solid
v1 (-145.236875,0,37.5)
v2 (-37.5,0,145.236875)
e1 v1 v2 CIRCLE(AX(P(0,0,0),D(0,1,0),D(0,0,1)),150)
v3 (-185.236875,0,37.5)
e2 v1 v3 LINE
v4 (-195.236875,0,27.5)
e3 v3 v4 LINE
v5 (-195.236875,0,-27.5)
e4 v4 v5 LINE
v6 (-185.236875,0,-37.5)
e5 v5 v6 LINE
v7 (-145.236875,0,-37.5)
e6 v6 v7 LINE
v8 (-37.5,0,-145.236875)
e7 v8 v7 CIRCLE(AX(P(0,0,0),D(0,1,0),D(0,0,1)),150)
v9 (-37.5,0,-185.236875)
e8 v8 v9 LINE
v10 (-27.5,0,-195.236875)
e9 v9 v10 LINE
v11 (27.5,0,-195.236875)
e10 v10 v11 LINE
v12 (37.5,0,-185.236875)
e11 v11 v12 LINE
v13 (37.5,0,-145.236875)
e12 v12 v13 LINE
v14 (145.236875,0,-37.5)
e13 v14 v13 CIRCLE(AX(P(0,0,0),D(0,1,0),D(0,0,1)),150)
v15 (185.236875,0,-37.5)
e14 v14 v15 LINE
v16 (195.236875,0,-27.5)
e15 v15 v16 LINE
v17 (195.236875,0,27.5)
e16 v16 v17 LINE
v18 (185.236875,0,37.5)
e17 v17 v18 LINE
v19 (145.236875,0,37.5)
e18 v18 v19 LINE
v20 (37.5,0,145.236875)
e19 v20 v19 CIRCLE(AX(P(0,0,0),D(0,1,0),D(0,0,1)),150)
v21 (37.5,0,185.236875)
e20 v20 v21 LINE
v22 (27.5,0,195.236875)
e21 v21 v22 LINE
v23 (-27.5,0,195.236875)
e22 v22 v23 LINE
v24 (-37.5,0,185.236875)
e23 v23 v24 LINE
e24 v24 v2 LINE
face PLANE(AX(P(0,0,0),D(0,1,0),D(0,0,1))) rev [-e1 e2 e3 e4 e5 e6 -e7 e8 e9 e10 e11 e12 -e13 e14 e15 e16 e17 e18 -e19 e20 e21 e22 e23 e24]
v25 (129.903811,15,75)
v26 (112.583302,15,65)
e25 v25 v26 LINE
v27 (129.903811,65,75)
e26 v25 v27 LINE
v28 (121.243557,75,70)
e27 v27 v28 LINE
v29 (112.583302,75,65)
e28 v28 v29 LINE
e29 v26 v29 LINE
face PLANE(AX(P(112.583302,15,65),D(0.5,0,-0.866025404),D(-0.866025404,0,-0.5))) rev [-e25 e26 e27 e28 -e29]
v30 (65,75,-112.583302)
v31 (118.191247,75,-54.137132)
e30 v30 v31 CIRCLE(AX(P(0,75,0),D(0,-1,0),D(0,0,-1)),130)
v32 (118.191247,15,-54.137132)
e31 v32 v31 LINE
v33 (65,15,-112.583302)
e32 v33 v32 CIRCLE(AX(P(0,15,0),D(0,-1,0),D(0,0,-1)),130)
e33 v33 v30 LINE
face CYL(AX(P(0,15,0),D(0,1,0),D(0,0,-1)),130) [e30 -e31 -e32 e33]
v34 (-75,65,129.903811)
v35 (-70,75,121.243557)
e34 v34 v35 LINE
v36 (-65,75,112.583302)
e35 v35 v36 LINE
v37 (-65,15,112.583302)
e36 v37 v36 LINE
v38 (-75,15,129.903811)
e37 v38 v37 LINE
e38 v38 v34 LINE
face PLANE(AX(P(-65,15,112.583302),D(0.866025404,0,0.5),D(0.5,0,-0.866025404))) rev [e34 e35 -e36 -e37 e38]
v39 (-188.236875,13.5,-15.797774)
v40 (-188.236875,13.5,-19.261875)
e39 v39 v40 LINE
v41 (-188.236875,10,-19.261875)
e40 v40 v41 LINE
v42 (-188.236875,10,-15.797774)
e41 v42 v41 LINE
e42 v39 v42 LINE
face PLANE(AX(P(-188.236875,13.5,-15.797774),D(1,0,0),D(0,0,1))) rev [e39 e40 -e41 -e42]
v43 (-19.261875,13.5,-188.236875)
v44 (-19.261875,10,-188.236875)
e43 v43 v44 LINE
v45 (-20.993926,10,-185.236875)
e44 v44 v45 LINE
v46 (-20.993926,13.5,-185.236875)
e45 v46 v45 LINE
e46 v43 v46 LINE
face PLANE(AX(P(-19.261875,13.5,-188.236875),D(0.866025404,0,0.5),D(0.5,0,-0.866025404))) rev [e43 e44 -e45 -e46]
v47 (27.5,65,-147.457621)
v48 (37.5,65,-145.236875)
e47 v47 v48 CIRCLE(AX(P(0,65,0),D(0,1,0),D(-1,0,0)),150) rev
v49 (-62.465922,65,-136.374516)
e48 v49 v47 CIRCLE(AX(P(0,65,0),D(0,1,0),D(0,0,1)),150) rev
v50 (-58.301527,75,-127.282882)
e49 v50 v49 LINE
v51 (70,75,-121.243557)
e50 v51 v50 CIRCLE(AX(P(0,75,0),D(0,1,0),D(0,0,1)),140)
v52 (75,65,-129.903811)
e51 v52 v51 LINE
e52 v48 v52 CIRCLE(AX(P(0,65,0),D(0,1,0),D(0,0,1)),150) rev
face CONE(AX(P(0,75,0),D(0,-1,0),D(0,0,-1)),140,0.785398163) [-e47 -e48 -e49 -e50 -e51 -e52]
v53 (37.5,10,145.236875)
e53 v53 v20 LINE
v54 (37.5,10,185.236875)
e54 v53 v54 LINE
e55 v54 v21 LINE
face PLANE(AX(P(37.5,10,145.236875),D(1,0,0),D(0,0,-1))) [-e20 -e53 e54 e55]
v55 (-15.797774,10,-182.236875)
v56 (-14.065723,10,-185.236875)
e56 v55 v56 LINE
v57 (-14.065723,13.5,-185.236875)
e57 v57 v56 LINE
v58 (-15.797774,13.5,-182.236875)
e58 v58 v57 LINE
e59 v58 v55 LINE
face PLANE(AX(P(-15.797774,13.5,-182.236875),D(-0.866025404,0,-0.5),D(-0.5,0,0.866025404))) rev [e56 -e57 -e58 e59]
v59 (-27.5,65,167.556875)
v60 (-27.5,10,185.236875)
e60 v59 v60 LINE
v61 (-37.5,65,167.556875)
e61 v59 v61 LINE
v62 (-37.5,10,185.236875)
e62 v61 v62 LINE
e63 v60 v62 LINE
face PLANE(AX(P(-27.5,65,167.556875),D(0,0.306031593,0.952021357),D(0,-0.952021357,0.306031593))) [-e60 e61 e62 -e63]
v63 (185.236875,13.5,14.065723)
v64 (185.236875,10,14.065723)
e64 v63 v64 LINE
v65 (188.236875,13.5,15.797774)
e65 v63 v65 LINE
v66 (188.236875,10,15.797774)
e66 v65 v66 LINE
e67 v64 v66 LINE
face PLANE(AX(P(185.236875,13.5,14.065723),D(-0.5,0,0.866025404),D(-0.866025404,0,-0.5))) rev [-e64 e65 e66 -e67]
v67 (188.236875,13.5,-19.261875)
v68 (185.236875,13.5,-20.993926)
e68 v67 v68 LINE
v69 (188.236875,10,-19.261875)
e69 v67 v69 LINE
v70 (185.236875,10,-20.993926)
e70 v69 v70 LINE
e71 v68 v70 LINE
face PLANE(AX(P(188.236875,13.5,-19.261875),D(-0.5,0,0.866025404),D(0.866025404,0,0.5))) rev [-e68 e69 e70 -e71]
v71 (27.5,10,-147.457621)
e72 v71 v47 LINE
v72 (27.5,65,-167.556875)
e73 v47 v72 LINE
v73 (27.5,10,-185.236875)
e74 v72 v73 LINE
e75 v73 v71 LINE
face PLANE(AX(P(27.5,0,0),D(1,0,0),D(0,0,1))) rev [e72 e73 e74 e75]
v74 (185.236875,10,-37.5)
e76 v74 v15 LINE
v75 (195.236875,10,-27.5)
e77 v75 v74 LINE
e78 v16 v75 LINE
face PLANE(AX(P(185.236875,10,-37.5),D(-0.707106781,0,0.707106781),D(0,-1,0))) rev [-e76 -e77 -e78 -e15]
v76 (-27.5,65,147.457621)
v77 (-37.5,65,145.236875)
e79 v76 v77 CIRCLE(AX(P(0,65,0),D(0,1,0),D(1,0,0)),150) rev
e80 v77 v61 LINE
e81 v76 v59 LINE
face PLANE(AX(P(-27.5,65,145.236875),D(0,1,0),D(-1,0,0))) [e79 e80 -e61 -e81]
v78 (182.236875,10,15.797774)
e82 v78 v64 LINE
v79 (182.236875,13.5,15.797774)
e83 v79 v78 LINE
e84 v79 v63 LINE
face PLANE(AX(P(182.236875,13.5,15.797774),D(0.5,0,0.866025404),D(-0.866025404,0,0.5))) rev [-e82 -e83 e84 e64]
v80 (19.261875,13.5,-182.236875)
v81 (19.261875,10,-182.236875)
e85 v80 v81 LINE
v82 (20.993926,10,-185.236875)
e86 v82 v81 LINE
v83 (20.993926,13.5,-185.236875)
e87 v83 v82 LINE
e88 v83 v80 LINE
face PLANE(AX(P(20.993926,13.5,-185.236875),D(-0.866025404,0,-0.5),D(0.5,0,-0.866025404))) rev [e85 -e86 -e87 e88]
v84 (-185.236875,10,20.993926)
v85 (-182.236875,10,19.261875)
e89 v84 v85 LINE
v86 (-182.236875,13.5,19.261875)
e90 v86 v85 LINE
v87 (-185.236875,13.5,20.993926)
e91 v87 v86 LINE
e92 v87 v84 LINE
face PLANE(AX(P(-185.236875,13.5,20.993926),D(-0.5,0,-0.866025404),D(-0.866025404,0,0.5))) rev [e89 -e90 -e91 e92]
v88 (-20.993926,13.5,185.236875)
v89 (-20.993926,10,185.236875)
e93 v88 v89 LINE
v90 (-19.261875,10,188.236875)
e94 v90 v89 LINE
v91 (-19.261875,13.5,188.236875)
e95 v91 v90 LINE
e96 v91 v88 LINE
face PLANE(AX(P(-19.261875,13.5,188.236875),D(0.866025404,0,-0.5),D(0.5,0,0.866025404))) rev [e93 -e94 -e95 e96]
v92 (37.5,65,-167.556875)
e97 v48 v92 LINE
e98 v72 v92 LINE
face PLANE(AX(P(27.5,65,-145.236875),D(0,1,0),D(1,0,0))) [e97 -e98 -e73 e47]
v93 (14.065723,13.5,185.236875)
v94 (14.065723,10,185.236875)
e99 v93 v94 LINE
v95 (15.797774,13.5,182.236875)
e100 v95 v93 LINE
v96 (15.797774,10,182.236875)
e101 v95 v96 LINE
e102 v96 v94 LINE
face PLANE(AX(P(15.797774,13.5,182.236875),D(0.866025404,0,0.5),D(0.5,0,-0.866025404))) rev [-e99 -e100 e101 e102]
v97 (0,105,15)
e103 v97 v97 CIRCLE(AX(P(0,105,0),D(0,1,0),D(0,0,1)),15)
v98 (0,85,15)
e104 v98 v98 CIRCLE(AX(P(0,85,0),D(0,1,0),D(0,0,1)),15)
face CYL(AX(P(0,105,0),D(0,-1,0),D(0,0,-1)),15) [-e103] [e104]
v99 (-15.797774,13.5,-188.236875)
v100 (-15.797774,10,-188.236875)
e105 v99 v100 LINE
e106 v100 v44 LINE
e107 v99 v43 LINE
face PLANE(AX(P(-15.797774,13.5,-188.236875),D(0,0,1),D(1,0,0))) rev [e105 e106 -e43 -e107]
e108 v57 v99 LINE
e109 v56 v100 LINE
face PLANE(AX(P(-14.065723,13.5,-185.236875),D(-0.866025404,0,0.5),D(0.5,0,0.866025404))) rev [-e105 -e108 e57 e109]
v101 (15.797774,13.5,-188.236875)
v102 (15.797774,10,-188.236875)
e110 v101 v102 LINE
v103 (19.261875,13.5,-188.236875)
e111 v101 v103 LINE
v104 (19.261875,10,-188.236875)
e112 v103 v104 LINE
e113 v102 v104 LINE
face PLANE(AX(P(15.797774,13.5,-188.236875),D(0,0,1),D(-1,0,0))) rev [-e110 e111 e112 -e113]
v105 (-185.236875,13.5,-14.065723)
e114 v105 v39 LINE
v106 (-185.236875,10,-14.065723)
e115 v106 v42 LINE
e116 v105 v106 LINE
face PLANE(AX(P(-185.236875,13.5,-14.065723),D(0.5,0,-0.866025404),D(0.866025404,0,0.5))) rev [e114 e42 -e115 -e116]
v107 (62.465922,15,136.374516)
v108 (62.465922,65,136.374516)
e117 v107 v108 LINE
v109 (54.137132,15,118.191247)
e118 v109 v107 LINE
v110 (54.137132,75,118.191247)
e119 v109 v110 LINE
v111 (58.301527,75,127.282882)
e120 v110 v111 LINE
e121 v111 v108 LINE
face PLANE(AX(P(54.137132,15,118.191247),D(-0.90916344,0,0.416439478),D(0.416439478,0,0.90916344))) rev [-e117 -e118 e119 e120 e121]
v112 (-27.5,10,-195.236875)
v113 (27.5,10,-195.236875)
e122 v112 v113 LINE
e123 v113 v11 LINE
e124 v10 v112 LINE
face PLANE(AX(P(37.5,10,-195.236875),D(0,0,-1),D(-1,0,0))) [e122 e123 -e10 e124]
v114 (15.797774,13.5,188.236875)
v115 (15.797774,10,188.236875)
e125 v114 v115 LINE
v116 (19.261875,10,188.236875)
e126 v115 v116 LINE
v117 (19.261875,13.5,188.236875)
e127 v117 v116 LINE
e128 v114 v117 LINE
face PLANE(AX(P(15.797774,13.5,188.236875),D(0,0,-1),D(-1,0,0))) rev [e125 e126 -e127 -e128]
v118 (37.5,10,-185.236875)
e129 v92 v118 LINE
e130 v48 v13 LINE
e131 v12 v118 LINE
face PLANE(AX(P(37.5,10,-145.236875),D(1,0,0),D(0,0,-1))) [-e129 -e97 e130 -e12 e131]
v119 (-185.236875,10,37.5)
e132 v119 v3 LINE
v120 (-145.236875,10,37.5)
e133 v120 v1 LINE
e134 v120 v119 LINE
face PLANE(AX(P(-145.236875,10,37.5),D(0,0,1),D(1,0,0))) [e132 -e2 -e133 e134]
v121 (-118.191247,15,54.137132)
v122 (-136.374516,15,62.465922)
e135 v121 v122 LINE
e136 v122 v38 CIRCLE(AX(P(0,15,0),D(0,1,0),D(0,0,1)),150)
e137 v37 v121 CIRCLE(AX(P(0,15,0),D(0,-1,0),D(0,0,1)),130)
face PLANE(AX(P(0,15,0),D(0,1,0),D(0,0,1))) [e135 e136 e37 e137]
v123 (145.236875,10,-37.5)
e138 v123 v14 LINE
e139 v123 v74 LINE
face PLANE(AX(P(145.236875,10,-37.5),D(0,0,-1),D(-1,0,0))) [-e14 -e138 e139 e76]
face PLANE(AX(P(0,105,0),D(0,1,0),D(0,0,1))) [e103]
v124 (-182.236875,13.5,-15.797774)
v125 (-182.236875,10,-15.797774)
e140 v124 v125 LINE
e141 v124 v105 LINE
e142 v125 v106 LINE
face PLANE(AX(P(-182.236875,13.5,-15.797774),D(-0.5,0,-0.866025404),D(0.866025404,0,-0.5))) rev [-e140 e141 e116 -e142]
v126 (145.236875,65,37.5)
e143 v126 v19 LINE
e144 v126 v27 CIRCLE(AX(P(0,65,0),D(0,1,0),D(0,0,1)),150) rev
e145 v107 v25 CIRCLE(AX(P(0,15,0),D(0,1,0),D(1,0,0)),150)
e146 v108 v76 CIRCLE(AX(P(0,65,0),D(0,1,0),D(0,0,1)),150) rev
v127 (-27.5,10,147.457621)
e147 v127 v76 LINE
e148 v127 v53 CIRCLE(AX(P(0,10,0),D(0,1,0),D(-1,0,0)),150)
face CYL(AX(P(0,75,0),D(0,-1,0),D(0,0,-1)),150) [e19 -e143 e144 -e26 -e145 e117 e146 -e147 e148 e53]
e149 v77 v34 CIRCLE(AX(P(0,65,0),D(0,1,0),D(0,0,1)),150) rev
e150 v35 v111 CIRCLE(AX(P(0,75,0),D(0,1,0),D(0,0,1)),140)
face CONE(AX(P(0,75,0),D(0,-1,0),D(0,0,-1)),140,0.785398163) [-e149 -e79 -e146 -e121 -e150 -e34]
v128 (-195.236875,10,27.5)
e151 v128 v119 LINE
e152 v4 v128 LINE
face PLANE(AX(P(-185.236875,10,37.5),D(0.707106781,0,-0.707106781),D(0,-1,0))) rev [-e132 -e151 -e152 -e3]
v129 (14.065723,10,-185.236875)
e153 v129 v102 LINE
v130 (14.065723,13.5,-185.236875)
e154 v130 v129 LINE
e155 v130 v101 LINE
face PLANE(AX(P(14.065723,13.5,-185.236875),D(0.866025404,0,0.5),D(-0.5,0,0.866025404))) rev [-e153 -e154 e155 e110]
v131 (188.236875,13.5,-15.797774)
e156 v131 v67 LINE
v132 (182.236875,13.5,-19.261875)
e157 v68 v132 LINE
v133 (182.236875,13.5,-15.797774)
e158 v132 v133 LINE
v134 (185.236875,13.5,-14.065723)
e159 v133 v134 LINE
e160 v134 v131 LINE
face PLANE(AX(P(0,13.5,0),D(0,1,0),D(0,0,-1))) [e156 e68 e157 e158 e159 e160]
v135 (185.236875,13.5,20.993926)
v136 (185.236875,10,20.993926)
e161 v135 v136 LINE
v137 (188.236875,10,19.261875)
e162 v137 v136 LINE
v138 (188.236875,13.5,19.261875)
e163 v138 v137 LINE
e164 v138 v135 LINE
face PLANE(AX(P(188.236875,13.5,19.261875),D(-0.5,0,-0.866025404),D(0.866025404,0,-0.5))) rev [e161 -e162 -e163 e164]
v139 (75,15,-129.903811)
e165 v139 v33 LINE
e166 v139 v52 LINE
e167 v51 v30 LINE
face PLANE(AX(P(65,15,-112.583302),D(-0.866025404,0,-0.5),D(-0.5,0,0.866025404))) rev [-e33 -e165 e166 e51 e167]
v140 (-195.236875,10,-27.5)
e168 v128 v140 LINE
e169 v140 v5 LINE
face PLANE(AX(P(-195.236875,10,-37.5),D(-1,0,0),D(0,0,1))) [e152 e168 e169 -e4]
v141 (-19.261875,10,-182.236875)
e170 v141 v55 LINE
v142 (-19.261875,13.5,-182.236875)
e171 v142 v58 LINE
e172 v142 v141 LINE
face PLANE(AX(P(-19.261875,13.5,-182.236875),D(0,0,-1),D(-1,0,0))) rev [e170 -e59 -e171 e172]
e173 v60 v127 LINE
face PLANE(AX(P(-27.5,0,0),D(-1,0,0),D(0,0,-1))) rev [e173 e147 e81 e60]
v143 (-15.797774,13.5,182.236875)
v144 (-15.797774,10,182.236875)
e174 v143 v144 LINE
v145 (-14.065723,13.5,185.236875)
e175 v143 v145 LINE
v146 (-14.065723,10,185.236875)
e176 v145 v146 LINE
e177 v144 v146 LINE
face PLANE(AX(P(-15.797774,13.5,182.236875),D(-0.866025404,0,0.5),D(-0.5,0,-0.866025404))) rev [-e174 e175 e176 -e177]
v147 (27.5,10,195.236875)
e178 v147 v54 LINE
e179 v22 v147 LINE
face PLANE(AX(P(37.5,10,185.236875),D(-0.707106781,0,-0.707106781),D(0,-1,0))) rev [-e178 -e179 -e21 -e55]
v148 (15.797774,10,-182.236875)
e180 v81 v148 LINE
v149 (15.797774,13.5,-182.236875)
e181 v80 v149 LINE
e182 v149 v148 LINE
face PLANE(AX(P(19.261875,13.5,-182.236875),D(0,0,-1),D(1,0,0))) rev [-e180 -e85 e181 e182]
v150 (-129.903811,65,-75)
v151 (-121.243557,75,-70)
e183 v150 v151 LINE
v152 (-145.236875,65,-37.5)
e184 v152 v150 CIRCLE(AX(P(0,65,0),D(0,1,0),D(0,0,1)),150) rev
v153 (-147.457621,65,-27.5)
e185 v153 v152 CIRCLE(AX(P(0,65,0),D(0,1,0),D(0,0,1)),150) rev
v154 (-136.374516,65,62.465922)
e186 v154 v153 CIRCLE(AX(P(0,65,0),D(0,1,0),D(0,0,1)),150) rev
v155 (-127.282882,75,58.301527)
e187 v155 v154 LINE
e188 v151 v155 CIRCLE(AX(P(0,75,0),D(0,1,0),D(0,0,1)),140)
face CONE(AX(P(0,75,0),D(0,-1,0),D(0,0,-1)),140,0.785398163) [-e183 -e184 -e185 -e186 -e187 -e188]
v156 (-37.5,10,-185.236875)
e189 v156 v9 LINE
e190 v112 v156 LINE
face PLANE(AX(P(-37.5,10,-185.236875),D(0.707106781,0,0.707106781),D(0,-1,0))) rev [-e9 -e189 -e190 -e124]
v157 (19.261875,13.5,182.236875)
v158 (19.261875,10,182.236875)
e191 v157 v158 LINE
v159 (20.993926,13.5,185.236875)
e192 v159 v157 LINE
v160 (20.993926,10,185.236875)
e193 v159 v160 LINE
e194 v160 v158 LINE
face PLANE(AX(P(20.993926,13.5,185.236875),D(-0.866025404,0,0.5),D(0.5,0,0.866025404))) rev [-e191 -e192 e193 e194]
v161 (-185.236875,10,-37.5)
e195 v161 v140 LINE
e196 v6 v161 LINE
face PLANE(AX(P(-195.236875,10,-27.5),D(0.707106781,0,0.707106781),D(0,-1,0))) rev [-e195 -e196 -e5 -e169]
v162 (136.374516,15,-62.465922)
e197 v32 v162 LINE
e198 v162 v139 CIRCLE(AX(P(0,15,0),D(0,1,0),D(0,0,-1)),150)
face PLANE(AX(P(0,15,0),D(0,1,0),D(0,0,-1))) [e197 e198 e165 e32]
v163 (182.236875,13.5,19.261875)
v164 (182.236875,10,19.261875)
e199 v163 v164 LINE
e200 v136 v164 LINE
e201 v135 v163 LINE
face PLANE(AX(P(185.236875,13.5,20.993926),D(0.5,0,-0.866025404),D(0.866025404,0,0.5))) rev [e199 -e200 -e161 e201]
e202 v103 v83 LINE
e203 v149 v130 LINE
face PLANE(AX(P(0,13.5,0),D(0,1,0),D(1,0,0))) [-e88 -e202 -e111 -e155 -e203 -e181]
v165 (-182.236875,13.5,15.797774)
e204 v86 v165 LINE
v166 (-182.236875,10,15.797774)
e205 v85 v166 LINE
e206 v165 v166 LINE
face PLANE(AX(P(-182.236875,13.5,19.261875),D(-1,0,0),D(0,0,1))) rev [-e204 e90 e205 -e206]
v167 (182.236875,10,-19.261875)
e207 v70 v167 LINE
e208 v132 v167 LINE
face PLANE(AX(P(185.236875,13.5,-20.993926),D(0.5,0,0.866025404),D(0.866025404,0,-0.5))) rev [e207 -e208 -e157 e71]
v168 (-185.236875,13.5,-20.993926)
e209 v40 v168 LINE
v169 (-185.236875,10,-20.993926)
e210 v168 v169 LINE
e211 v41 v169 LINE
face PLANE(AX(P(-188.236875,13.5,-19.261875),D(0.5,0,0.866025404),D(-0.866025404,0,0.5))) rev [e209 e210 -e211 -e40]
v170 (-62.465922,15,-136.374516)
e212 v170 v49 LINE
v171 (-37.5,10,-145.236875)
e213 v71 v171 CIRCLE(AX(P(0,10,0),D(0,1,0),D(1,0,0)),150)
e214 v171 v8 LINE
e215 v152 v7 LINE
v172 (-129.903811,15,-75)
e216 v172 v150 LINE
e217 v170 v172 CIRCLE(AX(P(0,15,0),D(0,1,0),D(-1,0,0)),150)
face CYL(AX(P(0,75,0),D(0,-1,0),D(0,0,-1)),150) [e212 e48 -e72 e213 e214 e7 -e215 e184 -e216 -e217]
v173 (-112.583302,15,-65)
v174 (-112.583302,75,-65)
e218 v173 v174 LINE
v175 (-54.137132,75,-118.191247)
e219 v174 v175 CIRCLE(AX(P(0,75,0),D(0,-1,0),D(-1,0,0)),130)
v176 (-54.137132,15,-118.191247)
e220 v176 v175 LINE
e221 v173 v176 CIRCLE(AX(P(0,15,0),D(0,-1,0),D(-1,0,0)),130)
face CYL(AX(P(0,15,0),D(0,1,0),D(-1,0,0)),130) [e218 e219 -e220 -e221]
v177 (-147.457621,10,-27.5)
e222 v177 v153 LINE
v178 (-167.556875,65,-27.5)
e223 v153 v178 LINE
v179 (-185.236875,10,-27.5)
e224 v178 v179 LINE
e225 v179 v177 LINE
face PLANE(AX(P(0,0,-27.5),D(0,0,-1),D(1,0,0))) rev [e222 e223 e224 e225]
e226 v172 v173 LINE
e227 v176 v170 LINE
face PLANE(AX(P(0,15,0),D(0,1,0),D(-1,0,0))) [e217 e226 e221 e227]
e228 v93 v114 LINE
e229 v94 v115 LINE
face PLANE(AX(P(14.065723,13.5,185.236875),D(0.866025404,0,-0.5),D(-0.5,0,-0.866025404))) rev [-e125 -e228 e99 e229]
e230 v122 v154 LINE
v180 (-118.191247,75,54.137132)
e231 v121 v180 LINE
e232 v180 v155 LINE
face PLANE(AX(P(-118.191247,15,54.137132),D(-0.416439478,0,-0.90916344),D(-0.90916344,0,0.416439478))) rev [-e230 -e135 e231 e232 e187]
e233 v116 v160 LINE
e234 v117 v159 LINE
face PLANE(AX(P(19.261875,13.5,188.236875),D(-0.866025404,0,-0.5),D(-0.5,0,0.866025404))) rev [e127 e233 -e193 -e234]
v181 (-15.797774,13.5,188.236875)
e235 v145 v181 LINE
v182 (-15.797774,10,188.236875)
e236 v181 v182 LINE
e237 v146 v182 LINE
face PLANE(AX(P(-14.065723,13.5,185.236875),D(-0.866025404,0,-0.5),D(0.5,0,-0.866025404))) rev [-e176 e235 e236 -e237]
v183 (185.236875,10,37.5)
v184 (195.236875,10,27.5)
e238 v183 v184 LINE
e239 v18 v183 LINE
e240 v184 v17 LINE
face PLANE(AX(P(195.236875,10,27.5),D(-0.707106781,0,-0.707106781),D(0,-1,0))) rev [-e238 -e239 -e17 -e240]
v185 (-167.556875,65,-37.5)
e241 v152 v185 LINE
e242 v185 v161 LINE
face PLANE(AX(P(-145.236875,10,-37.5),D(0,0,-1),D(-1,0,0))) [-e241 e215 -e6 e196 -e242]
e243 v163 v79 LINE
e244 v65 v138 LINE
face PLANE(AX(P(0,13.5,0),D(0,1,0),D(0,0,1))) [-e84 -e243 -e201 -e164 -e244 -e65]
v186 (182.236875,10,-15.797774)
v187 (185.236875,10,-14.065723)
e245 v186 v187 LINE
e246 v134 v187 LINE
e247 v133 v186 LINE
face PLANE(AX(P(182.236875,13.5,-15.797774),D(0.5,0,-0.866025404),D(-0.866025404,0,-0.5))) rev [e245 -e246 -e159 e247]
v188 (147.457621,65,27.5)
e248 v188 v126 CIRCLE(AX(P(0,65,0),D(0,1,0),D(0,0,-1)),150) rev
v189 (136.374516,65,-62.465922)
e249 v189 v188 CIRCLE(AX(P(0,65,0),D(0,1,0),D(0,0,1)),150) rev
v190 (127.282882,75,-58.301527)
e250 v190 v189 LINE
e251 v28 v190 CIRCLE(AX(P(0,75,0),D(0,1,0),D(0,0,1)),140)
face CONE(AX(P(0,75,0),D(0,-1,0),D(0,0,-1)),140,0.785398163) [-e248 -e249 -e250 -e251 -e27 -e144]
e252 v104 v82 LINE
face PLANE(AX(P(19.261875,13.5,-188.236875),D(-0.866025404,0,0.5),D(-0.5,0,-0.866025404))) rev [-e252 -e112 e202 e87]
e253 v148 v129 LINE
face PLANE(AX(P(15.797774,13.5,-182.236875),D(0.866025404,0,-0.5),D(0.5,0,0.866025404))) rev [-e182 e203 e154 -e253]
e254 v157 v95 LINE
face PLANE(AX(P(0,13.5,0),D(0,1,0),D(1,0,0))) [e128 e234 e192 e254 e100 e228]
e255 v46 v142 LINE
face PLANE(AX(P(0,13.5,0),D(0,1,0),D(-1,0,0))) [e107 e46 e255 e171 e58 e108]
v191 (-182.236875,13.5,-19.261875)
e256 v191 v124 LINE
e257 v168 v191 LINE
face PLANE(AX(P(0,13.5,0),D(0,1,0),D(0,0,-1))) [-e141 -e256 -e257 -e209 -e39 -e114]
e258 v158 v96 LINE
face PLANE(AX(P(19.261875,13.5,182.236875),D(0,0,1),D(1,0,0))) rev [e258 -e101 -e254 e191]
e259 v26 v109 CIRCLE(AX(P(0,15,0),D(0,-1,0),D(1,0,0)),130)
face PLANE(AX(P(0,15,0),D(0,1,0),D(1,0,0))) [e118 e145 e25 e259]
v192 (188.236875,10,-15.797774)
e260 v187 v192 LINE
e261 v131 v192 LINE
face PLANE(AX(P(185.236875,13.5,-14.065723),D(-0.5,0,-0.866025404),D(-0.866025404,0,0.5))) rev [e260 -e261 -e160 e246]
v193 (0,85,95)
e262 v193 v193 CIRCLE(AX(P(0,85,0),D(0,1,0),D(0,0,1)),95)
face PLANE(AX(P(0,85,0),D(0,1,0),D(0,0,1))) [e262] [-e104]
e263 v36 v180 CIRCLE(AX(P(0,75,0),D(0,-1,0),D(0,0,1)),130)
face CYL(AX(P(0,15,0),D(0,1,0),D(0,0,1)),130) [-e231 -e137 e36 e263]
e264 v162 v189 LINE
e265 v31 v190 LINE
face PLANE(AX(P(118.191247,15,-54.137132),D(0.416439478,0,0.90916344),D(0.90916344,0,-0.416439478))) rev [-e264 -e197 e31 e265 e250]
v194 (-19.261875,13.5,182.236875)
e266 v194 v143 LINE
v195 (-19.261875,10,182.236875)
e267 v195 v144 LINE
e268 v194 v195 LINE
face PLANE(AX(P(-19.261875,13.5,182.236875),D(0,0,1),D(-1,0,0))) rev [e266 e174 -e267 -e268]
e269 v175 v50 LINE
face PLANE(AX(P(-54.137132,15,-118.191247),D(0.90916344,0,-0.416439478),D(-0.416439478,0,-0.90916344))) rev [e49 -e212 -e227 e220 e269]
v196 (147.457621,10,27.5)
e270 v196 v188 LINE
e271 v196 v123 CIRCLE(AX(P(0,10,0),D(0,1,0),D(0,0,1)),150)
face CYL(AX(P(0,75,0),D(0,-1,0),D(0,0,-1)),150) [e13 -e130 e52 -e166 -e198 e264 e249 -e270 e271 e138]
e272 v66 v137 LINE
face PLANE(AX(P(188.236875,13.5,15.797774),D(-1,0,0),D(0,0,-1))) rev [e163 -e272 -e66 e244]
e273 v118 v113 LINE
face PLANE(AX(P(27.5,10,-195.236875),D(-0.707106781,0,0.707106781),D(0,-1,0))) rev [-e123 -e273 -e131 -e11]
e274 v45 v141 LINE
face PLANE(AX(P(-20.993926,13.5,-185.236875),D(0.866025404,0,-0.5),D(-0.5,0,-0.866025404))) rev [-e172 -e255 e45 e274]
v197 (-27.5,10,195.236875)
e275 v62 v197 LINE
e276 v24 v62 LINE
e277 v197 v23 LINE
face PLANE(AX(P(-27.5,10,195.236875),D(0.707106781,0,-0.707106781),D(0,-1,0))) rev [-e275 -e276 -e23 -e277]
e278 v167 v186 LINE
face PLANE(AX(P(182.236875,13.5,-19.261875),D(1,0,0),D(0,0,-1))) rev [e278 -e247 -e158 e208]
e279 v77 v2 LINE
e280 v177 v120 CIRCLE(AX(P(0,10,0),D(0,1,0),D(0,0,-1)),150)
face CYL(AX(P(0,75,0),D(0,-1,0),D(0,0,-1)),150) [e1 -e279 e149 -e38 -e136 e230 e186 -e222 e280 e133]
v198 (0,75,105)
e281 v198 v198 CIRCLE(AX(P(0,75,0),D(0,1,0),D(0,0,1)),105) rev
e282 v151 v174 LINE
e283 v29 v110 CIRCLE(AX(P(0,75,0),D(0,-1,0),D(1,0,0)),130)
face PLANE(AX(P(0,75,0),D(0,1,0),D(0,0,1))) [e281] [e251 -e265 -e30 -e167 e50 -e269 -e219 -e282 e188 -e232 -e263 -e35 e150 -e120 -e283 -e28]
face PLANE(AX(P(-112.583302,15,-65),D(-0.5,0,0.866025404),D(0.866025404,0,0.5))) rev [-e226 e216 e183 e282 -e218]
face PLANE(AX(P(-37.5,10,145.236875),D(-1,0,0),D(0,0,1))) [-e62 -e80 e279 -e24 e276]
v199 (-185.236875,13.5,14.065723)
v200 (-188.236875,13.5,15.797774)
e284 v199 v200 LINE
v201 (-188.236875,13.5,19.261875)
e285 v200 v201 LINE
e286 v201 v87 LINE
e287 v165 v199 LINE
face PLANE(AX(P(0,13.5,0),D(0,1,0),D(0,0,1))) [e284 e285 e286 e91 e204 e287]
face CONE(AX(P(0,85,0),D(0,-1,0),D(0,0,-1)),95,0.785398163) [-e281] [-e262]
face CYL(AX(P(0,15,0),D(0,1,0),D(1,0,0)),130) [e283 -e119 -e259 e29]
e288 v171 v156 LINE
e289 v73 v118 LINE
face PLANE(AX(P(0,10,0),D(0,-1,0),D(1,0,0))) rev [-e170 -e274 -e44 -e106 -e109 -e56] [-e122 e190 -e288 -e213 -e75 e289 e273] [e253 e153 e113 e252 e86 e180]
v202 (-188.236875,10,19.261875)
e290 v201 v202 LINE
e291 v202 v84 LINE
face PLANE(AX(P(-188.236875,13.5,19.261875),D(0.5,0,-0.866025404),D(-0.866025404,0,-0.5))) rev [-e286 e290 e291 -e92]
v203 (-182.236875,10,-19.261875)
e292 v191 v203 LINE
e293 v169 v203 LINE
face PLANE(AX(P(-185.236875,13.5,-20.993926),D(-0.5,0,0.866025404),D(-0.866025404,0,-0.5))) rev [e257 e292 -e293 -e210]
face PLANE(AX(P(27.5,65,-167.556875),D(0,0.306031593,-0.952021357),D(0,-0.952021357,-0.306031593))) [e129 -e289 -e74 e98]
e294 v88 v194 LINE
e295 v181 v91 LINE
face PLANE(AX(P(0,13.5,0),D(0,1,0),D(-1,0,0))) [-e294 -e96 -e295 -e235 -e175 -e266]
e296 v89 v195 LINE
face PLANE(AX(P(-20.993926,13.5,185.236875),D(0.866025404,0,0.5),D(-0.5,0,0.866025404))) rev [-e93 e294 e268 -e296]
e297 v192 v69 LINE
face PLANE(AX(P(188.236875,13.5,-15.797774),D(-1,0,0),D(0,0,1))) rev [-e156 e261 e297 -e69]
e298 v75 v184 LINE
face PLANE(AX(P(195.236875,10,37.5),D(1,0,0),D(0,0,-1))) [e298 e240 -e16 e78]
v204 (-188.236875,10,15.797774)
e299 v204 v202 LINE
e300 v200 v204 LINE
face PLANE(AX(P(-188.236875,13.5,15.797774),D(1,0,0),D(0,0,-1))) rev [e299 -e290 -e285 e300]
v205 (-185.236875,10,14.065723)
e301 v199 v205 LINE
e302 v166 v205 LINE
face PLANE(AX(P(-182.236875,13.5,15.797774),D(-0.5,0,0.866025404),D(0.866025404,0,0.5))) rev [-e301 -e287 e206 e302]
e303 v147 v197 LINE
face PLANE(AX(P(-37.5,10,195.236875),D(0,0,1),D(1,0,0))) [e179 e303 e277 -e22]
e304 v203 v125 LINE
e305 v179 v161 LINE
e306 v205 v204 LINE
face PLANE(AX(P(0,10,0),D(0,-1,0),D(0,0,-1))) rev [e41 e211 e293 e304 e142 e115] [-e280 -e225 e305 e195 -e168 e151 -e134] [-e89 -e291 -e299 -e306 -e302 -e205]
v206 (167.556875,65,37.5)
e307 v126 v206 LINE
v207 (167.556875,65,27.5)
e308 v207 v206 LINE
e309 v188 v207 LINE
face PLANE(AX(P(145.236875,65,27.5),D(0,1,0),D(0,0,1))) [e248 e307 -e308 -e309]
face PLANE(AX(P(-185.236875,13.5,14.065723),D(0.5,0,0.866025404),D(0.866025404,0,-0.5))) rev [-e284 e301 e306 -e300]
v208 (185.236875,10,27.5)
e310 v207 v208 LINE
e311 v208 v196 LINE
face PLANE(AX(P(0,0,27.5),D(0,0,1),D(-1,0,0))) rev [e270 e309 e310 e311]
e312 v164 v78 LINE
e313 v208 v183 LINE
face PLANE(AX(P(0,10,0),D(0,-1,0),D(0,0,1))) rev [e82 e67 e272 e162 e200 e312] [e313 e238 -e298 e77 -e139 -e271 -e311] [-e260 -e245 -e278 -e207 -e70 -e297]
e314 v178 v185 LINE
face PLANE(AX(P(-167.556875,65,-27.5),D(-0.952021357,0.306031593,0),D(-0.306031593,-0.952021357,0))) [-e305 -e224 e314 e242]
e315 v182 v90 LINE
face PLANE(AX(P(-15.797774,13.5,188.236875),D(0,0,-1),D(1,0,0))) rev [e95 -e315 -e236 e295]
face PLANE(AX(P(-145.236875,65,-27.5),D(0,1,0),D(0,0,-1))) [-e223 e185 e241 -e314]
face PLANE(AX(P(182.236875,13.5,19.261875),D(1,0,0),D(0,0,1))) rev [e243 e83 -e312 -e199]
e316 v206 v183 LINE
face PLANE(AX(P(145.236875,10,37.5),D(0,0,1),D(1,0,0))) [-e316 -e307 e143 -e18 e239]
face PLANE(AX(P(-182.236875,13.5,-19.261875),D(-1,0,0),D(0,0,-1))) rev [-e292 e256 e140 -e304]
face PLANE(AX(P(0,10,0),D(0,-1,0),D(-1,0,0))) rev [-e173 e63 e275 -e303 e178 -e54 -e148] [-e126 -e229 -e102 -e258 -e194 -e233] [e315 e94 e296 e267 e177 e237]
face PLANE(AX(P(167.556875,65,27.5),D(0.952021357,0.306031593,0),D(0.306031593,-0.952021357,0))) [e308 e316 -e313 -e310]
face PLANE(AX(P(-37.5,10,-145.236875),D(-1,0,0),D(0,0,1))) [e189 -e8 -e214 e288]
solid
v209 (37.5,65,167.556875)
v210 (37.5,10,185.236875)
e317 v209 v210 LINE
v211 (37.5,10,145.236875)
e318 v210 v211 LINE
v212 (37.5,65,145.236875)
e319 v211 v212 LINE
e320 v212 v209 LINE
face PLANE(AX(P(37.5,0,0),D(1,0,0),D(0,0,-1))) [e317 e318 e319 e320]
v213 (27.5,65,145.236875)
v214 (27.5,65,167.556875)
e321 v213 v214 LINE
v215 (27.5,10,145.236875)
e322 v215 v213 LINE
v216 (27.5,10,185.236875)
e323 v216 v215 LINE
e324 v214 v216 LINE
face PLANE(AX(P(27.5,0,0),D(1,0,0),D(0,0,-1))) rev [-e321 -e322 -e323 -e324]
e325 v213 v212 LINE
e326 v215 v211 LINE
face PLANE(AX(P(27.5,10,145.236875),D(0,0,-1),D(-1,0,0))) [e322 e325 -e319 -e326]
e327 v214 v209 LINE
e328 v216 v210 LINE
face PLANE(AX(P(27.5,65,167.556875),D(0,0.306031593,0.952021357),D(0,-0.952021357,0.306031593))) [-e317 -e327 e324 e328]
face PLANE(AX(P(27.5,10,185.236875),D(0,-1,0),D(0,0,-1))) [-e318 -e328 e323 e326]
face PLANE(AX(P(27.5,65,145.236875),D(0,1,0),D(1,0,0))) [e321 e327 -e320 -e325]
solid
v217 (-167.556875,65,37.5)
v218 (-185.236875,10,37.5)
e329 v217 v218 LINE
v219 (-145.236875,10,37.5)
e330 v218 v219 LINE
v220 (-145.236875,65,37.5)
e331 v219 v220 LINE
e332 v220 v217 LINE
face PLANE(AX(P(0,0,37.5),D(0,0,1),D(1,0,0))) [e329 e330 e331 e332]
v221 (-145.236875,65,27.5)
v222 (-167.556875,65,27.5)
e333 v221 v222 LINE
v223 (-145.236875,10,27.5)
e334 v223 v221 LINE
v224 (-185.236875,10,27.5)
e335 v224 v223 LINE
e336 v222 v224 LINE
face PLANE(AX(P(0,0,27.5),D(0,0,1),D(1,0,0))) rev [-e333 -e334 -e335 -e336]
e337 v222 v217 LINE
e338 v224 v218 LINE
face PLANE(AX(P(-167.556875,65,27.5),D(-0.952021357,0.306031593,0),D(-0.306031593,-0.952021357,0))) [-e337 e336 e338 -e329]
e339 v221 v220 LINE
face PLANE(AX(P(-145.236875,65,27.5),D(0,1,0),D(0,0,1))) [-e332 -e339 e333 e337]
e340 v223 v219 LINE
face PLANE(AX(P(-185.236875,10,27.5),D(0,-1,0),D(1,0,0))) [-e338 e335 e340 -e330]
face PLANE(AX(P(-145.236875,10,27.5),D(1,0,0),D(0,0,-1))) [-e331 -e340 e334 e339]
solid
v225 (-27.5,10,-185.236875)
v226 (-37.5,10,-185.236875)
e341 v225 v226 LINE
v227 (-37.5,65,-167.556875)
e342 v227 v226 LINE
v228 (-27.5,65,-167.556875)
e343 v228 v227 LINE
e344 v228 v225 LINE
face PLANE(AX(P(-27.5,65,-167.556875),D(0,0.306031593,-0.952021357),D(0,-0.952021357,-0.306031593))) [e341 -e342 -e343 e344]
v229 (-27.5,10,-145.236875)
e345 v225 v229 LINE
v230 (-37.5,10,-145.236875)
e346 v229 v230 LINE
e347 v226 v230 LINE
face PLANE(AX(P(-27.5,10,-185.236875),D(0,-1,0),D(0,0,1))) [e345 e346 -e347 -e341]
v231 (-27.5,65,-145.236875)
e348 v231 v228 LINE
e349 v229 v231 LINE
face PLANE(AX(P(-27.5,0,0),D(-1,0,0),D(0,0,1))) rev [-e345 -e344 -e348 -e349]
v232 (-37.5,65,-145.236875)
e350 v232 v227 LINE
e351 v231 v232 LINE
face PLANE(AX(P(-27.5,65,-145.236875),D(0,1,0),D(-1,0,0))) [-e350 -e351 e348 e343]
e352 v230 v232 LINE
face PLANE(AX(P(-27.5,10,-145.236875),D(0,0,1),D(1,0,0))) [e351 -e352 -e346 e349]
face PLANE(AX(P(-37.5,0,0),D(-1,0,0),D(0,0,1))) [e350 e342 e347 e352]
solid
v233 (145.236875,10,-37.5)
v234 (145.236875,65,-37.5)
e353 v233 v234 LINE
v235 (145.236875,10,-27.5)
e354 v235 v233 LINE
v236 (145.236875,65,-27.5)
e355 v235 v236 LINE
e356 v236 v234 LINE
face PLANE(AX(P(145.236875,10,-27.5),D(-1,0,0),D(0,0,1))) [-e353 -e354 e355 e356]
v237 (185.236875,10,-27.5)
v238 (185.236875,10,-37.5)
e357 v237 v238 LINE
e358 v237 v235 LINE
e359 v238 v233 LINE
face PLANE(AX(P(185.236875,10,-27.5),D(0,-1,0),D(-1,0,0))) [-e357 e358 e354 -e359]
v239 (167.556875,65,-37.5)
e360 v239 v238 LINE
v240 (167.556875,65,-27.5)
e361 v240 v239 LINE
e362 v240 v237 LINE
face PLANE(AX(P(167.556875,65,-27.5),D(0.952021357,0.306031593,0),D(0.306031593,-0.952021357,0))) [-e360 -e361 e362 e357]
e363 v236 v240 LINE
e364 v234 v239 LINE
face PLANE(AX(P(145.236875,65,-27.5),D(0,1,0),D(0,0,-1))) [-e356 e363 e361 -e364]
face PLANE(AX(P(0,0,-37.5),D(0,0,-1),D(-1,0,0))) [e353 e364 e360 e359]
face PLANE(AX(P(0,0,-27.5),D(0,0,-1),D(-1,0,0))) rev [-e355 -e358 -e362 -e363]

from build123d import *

# Parameters (mm, degrees)
SKETCH1_R           = 150
BOSS_EXTRUDE1_DEPTH = 75
CHAMFER1_SIZE       = 10
BOSS_EXTRUDE2_DEPTH = 10
CHAMFER2_SIZE       = 10
BOSS_EXTRUDE3_DEPTH = 10
BOSS_EXTRUDE4_DEPTH = 3.5
CIRPATTERN8_COUNT   = 4
CUT_EXTRUDE1_START  = -60
CUT_EXTRUDE1_DEPTH  = 60
SKETCH6_R           = 110
BOSS_EXTRUDE5_DEPTH = 10
CHAMFER3_SIZE       = 15
SKETCH7_R           = 15
BOSS_EXTRUDE6_DEPTH = 20
CIRPATTERN9_COUNT   = 4


with BuildPart() as part:
    # Sketch1 → Boss-Extrude1 (new body)
    with BuildSketch(Plane(origin=(0, 0, 0), x_dir=(1, 0, 0), z_dir=(0, 1, 0))):
        with Locations(Location((0, 0, 0), (0, 0, 270))):
            Circle(SKETCH1_R)
    extrude(amount=BOSS_EXTRUDE1_DEPTH)

    # Chamfer1
    chamfer1_edges = [part.edges().sort_by_distance(p)[0] for p in [
        (0, 75, -150),
    ]]
    chamfer(chamfer1_edges, length=CHAMFER1_SIZE)

    # Sketch2 → Boss-Extrude2 (add)
    with BuildSketch(Plane.XZ):
        with BuildLine():
            Line((-145.236875483, -37.5), (-195.236875483, -37.5))
            Line((-195.236875483, -37.5), (-195.236875483, 37.5))
            Line((-195.236875483, 37.5), (-145.236875483, 37.5))
            ThreePointArc((-145.236875483, 37.5), (-150, 0), (-145.236875483, -37.5))
        make_face()
    extrude(amount=-BOSS_EXTRUDE2_DEPTH)

    # Chamfer2
    chamfer2_edges = [part.edges().sort_by_distance(p)[0] for p in [
        (-195.236875483, 5, -37.5),
        (-195.236875483, 5, 37.5),
    ]]
    chamfer(chamfer2_edges, length=CHAMFER2_SIZE)

    # Sketch4 → Boss-Extrude4 (add)
    with BuildSketch(Plane(origin=(0, 10, 0), x_dir=(1, 0, 0), z_dir=(0, 1, 0))):
        Polygon((-185.236875483, -14.0657227), (-188.236875483, -15.797773507), (-188.236875483, -19.261875122), (-185.236875483, -20.99392593), (-182.236875483, -19.261875122), (-182.236875483, -15.797773507), align=None)
    boss_extrude4 = extrude(amount=BOSS_EXTRUDE4_DEPTH)


with BuildPart() as body_2:
    # Sketch3 → Boss-Extrude3 (new body)
    with BuildSketch(Plane.XY.offset(37.5)):
        Polygon((-185.236875483, 10), (-145.236875483, 10), (-145.236875483, 65), (-167.556875483, 65), align=None)
    boss_extrude3 = extrude(amount=-BOSS_EXTRUDE3_DEPTH)


with BuildPart() as part_1:
    add(part.part)

    # Mirror1: Boss-Extrude3, Boss-Extrude4 across plane
    add(boss_extrude3.mirror(Plane.XY))
    add(boss_extrude4.mirror(Plane.XY))


with BuildPart() as cirpattern8_1:
    # CirPattern8: pattern copy
    add(body_2.part.rotate(Axis((0, 0, 0), (0, 1, 0)), 1 * 360 / CIRPATTERN8_COUNT))


with BuildPart() as cirpattern8_2:
    # CirPattern8: pattern copy
    add(body_2.part.rotate(Axis((0, 0, 0), (0, 1, 0)), 2 * 360 / CIRPATTERN8_COUNT))


with BuildPart() as cirpattern8_3:
    # CirPattern8: pattern copy
    add(body_2.part.rotate(Axis((0, 0, 0), (0, 1, 0)), 3 * 360 / CIRPATTERN8_COUNT))


with BuildPart() as cirpattern8_4:
    # CirPattern8: pattern copy
    add(part_1.part.rotate(Axis((0, 0, 0), (0, 1, 0)), 1 * 360 / CIRPATTERN8_COUNT))


with BuildPart() as cirpattern8_5:
    # CirPattern8: pattern copy
    add(part_1.part.rotate(Axis((0, 0, 0), (0, 1, 0)), 2 * 360 / CIRPATTERN8_COUNT))


with BuildPart() as cirpattern8_6:
    # CirPattern8: pattern copy
    add(part_1.part.rotate(Axis((0, 0, 0), (0, 1, 0)), 3 * 360 / CIRPATTERN8_COUNT))


with BuildPart() as cut_extrude1_tool:
    # Sketch5 → Cut-Extrude1 (new body)
    with BuildSketch(Plane(origin=(0, 75, 0), x_dir=(1, 0, 0), z_dir=(0, 1, 0)).offset(CUT_EXTRUDE1_START)):
        with BuildLine():
            Line((-118.191247264, -54.137132082), (-136.374516074, -62.465921634))
            ThreePointArc((-136.374516074, -62.465921634), (-110.935854111, -100.96155839), (-75, -129.903810568))
            Line((-75, -129.903810568), (-65, -112.583302492))
            ThreePointArc((-65, -112.583302492), (-96.144406896, -87.500017272), (-118.191247264, -54.137132082))
        make_face()
    cut_extrude1 = extrude(amount=CUT_EXTRUDE1_DEPTH)


with BuildPart() as part_2:
    add(part_1.part)

    # Cut-Extrude1: cut by cut_extrude1_tool
    add(cut_extrude1_tool.part, mode=Mode.SUBTRACT)



with BuildPart() as cirpattern8_4_1:
    add(cirpattern8_4.part)

    # Cut-Extrude1: cut by cut_extrude1_tool
    add(cut_extrude1_tool.part, mode=Mode.SUBTRACT)


with BuildPart() as cirpattern8_5_1:
    add(cirpattern8_5.part)

    # Cut-Extrude1: cut by cut_extrude1_tool
    add(cut_extrude1_tool.part, mode=Mode.SUBTRACT)


with BuildPart() as cirpattern8_6_1:
    add(cirpattern8_6.part)

    # Cut-Extrude1: cut by cut_extrude1_tool
    add(cut_extrude1_tool.part, mode=Mode.SUBTRACT)


with BuildPart() as part_3:
    add(part_2.part)

    add(cirpattern8_4_1.part)  # Boss-Extrude5 merges CirPattern8_4

    add(cirpattern8_5_1.part)  # Boss-Extrude5 merges CirPattern8_5

    add(cirpattern8_6_1.part)  # Boss-Extrude5 merges CirPattern8_6
    # Sketch6 → Boss-Extrude5 (add)
    with BuildSketch(Plane(origin=(0, 75, 0), x_dir=(1, 0, 0), z_dir=(0, 1, 0))):
        with Locations(Location((0, 0, 0), (0, 0, 270))):
            Circle(SKETCH6_R)
    extrude(amount=BOSS_EXTRUDE5_DEPTH)

    # Chamfer3
    # the kernel refuses this chamfer: 15 mm, written as the material it takes off along each edge
    with BuildSketch(Plane(origin=(0, 85, 0), x_dir=(0, 0, 1), z_dir=(-1, 0, 0))) as chamfer3_piece_1_section:
        Polygon((110, -CHAMFER3_SIZE), (110 - CHAMFER3_SIZE, 0), (110, 0), align=None)
    chamfer3_piece_1 = revolve(axis=Axis((0, 85, 0), (0, 1, 0)), mode=Mode.PRIVATE)
    chamfer3_piece_1 = split(chamfer3_piece_1, bisect_by=Plane(origin=(0, 75, -100.081022807), z_dir=(0, 1, 0)), keep=Keep.TOP, mode=Mode.PRIVATE)
    add(chamfer3_piece_1, mode=Mode.SUBTRACT)

    # Sketch7 → Boss-Extrude6 (add)
    with BuildSketch(Plane(origin=(0, 85, 0), x_dir=(1, 0, 0), z_dir=(0, 1, 0))):
        with Locations(Location((0, 0, 0), (0, 0, 270))):
            Circle(SKETCH7_R)
    extrude(amount=BOSS_EXTRUDE6_DEPTH)

    # CirPattern9: Cut-Extrude1 ×4 about axis
    cirpattern9_axis = Axis((0, 0, 0), (0, -1, 0))
    for i in range(1, CIRPATTERN9_COUNT):
        add(cut_extrude1.rotate(cirpattern9_axis, i * 360 / CIRPATTERN9_COUNT), mode=Mode.SUBTRACT)


solid = Compound([body_2.part, cirpattern8_1.part, cirpattern8_2.part, cirpattern8_3.part, part_3.part])
